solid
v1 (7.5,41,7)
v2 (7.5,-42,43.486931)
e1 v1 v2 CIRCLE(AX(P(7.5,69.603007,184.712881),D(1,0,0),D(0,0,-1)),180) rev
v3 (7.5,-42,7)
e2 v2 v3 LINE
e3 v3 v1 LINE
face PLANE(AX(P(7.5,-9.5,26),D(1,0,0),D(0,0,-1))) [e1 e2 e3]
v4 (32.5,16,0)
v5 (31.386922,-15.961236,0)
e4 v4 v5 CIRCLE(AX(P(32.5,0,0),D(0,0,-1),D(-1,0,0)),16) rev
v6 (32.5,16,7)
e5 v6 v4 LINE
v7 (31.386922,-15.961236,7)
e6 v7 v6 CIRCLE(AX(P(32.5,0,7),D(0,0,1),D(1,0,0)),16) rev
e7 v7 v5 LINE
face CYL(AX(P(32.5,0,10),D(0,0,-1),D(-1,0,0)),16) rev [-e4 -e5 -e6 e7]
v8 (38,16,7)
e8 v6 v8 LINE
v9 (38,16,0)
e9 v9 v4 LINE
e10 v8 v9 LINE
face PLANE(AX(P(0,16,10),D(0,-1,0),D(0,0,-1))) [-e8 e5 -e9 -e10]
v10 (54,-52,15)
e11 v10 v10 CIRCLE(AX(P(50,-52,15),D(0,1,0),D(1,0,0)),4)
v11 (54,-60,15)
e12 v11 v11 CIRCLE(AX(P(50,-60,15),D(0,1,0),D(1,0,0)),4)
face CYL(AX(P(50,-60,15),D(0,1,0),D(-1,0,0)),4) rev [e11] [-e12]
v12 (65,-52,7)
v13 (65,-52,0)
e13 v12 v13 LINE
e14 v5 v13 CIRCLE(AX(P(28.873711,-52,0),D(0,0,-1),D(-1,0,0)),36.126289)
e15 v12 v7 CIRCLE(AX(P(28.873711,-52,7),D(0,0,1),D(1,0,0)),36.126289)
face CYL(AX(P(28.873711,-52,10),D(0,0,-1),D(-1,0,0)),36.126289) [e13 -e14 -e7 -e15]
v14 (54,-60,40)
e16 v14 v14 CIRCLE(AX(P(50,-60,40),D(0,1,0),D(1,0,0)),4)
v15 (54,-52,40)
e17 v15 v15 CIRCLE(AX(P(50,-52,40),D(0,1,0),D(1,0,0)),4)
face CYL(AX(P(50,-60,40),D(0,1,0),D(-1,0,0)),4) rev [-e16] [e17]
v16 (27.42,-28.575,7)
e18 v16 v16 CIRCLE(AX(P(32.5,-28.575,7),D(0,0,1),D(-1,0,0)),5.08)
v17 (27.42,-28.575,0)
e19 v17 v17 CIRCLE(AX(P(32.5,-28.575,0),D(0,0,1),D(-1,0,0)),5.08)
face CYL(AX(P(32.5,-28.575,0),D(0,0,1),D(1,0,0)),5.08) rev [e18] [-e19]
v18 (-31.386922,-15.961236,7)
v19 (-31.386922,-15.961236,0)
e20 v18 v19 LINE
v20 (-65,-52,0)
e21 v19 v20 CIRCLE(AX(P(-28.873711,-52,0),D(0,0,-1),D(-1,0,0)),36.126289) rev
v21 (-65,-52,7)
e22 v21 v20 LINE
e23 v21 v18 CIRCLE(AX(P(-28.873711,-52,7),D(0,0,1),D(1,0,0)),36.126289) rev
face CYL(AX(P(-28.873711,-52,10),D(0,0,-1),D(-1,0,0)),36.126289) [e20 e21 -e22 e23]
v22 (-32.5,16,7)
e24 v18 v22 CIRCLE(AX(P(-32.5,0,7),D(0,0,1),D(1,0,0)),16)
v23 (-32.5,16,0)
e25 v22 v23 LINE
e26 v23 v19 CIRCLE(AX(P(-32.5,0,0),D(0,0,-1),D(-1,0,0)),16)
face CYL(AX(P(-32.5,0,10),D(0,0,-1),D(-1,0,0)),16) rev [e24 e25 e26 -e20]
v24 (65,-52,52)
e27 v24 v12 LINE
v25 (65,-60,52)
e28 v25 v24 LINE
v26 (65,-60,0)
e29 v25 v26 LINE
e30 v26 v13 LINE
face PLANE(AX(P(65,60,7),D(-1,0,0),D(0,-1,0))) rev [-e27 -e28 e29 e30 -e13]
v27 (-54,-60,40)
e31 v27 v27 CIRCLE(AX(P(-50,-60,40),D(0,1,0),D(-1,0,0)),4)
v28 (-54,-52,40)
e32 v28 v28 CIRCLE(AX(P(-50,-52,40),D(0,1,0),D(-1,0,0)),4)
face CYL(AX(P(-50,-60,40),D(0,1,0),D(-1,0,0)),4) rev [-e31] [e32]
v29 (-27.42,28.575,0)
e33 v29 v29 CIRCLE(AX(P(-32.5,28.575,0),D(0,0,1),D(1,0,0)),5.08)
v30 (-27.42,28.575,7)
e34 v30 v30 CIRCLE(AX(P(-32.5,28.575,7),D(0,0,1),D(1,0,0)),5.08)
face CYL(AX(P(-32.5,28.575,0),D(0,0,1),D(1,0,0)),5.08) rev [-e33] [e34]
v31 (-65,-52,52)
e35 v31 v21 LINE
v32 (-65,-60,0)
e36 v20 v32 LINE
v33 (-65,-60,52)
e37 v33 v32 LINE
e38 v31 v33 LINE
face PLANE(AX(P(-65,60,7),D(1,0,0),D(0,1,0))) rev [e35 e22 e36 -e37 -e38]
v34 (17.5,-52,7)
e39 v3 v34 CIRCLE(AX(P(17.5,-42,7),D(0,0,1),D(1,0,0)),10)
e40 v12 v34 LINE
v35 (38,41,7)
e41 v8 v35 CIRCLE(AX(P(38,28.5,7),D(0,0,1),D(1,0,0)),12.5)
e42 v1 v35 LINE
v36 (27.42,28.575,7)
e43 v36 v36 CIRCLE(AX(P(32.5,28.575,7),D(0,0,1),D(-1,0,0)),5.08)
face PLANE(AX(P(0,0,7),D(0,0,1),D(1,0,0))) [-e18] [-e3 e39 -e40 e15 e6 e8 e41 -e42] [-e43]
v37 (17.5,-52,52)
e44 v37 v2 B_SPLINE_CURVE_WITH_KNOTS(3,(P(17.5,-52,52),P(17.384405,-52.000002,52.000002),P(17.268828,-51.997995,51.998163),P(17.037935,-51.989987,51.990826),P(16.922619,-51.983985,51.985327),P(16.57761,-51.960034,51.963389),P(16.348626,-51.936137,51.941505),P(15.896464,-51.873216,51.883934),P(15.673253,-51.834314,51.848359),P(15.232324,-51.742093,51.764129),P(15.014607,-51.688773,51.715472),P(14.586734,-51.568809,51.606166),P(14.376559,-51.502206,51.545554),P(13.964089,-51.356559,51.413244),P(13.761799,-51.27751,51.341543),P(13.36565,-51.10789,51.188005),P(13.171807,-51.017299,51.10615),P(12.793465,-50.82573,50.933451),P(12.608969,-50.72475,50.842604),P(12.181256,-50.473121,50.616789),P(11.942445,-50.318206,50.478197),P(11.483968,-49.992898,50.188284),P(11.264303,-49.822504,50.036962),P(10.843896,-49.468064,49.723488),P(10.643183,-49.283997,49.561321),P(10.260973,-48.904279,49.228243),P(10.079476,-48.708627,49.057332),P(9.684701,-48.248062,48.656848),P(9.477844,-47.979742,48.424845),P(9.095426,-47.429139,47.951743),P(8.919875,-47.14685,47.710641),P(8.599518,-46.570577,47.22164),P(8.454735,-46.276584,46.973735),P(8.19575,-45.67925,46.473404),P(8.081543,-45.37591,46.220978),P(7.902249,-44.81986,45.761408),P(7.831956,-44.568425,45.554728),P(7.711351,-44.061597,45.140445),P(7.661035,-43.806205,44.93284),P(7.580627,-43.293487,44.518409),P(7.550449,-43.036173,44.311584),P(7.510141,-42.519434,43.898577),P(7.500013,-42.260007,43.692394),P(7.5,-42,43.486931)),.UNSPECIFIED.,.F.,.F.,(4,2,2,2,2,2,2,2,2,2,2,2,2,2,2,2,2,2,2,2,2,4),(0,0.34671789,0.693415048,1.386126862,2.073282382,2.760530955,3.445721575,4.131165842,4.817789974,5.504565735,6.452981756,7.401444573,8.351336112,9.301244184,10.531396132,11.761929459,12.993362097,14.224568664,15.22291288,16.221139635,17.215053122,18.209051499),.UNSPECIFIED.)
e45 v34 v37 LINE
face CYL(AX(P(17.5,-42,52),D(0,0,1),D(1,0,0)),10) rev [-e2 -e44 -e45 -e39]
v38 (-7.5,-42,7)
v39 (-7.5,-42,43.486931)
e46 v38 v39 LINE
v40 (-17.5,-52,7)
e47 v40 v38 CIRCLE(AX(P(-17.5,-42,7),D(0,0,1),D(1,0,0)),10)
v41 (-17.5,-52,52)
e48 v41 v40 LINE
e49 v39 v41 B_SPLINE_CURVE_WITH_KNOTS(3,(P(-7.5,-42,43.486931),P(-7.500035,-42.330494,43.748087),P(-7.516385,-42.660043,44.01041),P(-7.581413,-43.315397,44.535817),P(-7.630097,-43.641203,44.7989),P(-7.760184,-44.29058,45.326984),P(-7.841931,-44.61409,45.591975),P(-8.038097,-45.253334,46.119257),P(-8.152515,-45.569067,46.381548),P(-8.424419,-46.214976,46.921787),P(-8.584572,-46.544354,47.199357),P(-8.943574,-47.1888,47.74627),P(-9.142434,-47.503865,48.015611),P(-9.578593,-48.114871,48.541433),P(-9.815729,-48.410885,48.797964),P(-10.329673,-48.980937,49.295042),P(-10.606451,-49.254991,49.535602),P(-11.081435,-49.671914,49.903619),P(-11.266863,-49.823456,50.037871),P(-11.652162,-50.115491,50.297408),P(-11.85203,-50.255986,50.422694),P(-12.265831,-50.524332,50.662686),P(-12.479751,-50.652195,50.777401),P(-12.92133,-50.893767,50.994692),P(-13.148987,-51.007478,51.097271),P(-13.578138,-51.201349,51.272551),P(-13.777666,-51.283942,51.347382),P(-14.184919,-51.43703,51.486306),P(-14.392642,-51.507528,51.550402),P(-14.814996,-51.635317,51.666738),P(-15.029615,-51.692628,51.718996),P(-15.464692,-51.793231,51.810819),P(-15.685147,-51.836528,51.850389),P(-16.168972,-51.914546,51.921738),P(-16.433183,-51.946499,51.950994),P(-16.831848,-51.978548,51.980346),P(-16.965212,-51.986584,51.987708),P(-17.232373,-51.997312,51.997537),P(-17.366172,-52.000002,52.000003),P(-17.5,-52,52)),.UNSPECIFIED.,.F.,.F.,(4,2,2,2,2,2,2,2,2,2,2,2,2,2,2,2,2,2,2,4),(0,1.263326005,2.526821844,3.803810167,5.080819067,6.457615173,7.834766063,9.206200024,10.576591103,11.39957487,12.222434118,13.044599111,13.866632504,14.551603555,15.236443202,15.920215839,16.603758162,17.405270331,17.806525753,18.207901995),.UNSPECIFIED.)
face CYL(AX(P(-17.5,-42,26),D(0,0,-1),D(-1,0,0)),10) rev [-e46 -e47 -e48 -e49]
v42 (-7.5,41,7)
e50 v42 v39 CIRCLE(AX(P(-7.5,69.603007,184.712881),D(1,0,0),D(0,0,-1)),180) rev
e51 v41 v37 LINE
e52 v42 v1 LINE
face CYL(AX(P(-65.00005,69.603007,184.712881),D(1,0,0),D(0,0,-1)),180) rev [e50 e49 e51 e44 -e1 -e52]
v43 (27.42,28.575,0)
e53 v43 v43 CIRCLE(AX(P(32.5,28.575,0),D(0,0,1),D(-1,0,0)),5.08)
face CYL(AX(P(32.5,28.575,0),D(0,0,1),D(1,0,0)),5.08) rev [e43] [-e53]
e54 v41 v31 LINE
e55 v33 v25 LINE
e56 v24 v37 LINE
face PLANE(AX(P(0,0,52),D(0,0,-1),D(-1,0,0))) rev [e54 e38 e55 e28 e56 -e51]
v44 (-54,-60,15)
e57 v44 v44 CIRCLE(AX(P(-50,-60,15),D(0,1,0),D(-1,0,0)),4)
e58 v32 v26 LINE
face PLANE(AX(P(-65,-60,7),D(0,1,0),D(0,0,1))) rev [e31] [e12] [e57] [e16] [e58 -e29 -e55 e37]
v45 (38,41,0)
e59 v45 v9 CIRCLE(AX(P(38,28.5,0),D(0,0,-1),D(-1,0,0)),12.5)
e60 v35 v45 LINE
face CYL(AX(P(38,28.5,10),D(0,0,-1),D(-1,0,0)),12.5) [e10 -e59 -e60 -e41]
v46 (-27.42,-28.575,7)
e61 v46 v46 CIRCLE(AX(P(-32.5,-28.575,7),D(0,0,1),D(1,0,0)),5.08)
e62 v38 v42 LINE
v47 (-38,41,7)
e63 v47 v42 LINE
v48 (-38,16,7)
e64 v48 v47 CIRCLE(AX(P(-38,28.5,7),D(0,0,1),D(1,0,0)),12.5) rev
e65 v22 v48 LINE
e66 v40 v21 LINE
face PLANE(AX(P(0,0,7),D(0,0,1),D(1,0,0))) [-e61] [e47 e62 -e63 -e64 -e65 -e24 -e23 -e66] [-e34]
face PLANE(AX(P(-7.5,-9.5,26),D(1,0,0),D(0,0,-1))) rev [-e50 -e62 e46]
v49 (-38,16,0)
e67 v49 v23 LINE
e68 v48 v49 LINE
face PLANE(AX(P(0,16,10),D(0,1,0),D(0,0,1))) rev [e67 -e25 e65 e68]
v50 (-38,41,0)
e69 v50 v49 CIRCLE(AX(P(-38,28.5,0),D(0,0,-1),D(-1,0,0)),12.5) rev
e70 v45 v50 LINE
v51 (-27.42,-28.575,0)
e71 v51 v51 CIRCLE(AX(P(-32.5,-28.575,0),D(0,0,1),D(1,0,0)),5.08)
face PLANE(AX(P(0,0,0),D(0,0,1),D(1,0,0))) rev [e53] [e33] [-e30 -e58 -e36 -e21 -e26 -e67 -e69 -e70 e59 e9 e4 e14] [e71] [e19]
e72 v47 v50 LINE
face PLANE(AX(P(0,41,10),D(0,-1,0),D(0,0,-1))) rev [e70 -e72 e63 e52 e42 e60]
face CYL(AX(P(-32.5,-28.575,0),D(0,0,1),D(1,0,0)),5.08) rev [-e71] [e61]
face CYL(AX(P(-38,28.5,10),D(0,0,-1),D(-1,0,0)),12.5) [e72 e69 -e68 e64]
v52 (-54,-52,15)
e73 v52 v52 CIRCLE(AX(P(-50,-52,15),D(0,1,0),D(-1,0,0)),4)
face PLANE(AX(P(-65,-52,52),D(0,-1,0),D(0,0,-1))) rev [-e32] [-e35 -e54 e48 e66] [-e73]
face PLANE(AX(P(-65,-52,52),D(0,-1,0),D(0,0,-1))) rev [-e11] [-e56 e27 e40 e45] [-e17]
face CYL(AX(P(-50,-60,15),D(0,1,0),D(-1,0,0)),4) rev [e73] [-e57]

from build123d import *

# Parameters (mm, degrees)
SKETCH1_W               = 130
SKETCH1_H               = 120
BOSS_EXTRUDE1_DEPTH     = 7
SKETCH2_R               = 13.462
SKETCH2_R_2             = 5.08
CUT_EXTRUDE1_DEPTH      = 89.735562206
SKETCH4_W               = 130
SKETCH4_H               = 8
BOSS_EXTRUDE2_DEPTH     = 45
CUT_EXTRUDE4_START      = -10
SKETCH10_R              = 13.462
CUT_EXTRUDE4_DEPTH      = 10
SKETCH11_R              = 4
CUT_EXTRUDE5_DEPTH      = 125.811858411
RIB1_REACH              = 104.611
SKETCH9_WALL_W          = 310.536883344
SKETCH9_WALL_H          = 15
CUT_EXTRUDE6_DEPTH      = 108.518603042
CUT_EXTRUDE6_DEPTH_BACK = 108.518603042
FILLET1_R               = 10


with BuildPart() as part:
    # Sketch1 → Boss-Extrude1 (new body)
    with BuildSketch(Plane.XY):
        Rectangle(SKETCH1_W, SKETCH1_H)
    extrude(amount=BOSS_EXTRUDE1_DEPTH)

    # Sketch2 → Cut-Extrude1 (cut, through all)
    with BuildSketch(Plane.XY.offset(7)):
        with Locations((-32.5, 0)):
            Circle(SKETCH2_R)
        with Locations((-32.5, 28.575)):
            Circle(SKETCH2_R_2)
        with Locations((-32.5, -28.575)):
            Circle(SKETCH2_R_2)
        with Locations(Location((32.5, -28.575, 0), (0, 0, 180))):
            Circle(SKETCH2_R_2)
        with Locations(Location((32.5, 0, 0), (0, 0, 180))):
            Circle(SKETCH2_R)
        with Locations(Location((32.5, 28.575, 0), (0, 0, 180))):
            Circle(SKETCH2_R_2)
    extrude(amount=-CUT_EXTRUDE1_DEPTH, mode=Mode.SUBTRACT)

    # Sketch4 → Boss-Extrude2 (add)
    with BuildSketch(Plane.XY.offset(7)):
        with Locations((0, -56)):
            Rectangle(SKETCH4_W, SKETCH4_H)
    extrude(amount=BOSS_EXTRUDE2_DEPTH)

    # Sketch10 → Cut-Extrude4 (cut)
    with BuildSketch(Plane(origin=(0, 0, 0), x_dir=(-1, 0, 0), z_dir=(0, 0, -1)).offset(CUT_EXTRUDE4_START)):
        with BuildLine():
            ThreePointArc((31.386922126, -15.961236094), (55.292470874, -27.359426204), (65, -52))
            Line((65, -52), (65, 60))
            Line((65, 60), (-65, 60))
            Line((-65, 60), (-65, -52))
            ThreePointArc((-65, -52), (-55.292470874, -27.359426204), (-31.386922126, -15.961236094))
            ThreePointArc((-31.386922126, -15.961236094), (-16.509693913, 0.556876331), (-32.5, 16))
            Line((-32.5, 16), (-38, 16))
            ThreePointArc((-38, 16), (-50.5, 28.5), (-38, 41))
            Line((-38, 41), (38, 41))
            ThreePointArc((38, 41), (50.5, 28.5), (38, 16))
            Line((38, 16), (32.5, 16))
            ThreePointArc((32.5, 16), (16.509693913, 0.556876331), (31.386922126, -15.961236094))
        make_face()
        with Locations((-32.5, 0)):
            Circle(SKETCH10_R, mode=Mode.SUBTRACT)
        with Locations((32.5, 0)):
            Circle(SKETCH10_R, mode=Mode.SUBTRACT)
    extrude(amount=CUT_EXTRUDE4_DEPTH, mode=Mode.SUBTRACT)

    # Sketch11 → Cut-Extrude5 (cut, through all)
    with BuildSketch(Plane(origin=(0, -52, 0), x_dir=(1, 0, 0), z_dir=(0, 1, 0))):
        with Locations(Location((-50, -15, 0), (0, 0, 180))):
            Circle(SKETCH11_R)
        with Locations(Location((-50, -40, 0), (0, 0, 180))):
            Circle(SKETCH11_R)
        with Locations((50, -40)):
            Circle(SKETCH11_R)
        with Locations((50, -15)):
            Circle(SKETCH11_R)
    extrude(amount=-CUT_EXTRUDE5_DEPTH, mode=Mode.SUBTRACT)

    # Sketch9 wall → Rib1 (add, up to next)
    with BuildSketch(Plane(origin=(0, -5.5, 29.5), x_dir=(0, -0.900159251416, 0.435560928104), z_dir=(0, -0.435560928104, -0.900159251416)), mode=Mode.PRIVATE) as rib1_sk1:
        Rectangle(SKETCH9_WALL_W, SKETCH9_WALL_H)
    rib1_tool1 = extrude(rib1_sk1.sketch, amount=RIB1_REACH, mode=Mode.PRIVATE) - part.part
    add(rib1_tool1.solids().sort_by_distance((0, -5.5, 29.5))[0])

    # Sketch13 → Cut-Extrude6 (cut, two sides: drawn at the far end of the back side and taken through both)
    with BuildSketch(Plane(origin=(7.5, 0, 0), x_dir=(0, 0, -1), z_dir=(1, 0, 0)).offset(-CUT_EXTRUDE6_DEPTH_BACK)):
        with BuildLine():
            ThreePointArc((-7, 41), (-22.684215539, -8.797960223), (-52, -52))
            Line((-52, -52), (-7, 41))
        make_face()
    extrude(amount=CUT_EXTRUDE6_DEPTH + CUT_EXTRUDE6_DEPTH_BACK, mode=Mode.SUBTRACT)

    # Fillet1
    # the kernel refuses this fillet: 10 mm, written as the material it adds along each edge
    with BuildSketch(Plane(origin=(7.5, -52, 7), x_dir=(1, 0, 0), z_dir=(0, 0, 1))) as fillet1_piece_1_section:
        with BuildLine():
            CenterArc((FILLET1_R, FILLET1_R), FILLET1_R, 180, 90)
            Line((0, FILLET1_R), (0, 0))
            Line((0, 0), (FILLET1_R, 0))
        make_face()
    fillet1_piece_1 = extrude(amount=45, mode=Mode.PRIVATE)
    fillet1_piece_1 = fillet1_piece_1 - Plane(origin=(9.819534596, 69.603006836, 184.712880794), x_dir=(0, -0.15890559353119482, -0.9872937821866897), z_dir=(-1, 0, 0)) * Cylinder(180, 130, mode=Mode.PRIVATE)
    add(fillet1_piece_1)
    with BuildSketch(Plane(origin=(-7.5, -52, 52), x_dir=(-1, 0, 0), z_dir=(0, 0, -1))) as fillet1_piece_2_section:
        with BuildLine():
            CenterArc((FILLET1_R, FILLET1_R), FILLET1_R, 180, 90)
            Line((0, FILLET1_R), (0, 0))
            Line((0, 0), (FILLET1_R, 0))
        make_face()
    fillet1_piece_2 = extrude(amount=45, mode=Mode.PRIVATE)
    fillet1_piece_2 = fillet1_piece_2 - Plane(origin=(-9.819536327, 69.603006836, 184.712880794), x_dir=(0, -0.15890559353119482, -0.9872937821866897), z_dir=(-1, 0, 0)) * Cylinder(180, 130, mode=Mode.PRIVATE)
    add(fillet1_piece_2)


solid = part.part
